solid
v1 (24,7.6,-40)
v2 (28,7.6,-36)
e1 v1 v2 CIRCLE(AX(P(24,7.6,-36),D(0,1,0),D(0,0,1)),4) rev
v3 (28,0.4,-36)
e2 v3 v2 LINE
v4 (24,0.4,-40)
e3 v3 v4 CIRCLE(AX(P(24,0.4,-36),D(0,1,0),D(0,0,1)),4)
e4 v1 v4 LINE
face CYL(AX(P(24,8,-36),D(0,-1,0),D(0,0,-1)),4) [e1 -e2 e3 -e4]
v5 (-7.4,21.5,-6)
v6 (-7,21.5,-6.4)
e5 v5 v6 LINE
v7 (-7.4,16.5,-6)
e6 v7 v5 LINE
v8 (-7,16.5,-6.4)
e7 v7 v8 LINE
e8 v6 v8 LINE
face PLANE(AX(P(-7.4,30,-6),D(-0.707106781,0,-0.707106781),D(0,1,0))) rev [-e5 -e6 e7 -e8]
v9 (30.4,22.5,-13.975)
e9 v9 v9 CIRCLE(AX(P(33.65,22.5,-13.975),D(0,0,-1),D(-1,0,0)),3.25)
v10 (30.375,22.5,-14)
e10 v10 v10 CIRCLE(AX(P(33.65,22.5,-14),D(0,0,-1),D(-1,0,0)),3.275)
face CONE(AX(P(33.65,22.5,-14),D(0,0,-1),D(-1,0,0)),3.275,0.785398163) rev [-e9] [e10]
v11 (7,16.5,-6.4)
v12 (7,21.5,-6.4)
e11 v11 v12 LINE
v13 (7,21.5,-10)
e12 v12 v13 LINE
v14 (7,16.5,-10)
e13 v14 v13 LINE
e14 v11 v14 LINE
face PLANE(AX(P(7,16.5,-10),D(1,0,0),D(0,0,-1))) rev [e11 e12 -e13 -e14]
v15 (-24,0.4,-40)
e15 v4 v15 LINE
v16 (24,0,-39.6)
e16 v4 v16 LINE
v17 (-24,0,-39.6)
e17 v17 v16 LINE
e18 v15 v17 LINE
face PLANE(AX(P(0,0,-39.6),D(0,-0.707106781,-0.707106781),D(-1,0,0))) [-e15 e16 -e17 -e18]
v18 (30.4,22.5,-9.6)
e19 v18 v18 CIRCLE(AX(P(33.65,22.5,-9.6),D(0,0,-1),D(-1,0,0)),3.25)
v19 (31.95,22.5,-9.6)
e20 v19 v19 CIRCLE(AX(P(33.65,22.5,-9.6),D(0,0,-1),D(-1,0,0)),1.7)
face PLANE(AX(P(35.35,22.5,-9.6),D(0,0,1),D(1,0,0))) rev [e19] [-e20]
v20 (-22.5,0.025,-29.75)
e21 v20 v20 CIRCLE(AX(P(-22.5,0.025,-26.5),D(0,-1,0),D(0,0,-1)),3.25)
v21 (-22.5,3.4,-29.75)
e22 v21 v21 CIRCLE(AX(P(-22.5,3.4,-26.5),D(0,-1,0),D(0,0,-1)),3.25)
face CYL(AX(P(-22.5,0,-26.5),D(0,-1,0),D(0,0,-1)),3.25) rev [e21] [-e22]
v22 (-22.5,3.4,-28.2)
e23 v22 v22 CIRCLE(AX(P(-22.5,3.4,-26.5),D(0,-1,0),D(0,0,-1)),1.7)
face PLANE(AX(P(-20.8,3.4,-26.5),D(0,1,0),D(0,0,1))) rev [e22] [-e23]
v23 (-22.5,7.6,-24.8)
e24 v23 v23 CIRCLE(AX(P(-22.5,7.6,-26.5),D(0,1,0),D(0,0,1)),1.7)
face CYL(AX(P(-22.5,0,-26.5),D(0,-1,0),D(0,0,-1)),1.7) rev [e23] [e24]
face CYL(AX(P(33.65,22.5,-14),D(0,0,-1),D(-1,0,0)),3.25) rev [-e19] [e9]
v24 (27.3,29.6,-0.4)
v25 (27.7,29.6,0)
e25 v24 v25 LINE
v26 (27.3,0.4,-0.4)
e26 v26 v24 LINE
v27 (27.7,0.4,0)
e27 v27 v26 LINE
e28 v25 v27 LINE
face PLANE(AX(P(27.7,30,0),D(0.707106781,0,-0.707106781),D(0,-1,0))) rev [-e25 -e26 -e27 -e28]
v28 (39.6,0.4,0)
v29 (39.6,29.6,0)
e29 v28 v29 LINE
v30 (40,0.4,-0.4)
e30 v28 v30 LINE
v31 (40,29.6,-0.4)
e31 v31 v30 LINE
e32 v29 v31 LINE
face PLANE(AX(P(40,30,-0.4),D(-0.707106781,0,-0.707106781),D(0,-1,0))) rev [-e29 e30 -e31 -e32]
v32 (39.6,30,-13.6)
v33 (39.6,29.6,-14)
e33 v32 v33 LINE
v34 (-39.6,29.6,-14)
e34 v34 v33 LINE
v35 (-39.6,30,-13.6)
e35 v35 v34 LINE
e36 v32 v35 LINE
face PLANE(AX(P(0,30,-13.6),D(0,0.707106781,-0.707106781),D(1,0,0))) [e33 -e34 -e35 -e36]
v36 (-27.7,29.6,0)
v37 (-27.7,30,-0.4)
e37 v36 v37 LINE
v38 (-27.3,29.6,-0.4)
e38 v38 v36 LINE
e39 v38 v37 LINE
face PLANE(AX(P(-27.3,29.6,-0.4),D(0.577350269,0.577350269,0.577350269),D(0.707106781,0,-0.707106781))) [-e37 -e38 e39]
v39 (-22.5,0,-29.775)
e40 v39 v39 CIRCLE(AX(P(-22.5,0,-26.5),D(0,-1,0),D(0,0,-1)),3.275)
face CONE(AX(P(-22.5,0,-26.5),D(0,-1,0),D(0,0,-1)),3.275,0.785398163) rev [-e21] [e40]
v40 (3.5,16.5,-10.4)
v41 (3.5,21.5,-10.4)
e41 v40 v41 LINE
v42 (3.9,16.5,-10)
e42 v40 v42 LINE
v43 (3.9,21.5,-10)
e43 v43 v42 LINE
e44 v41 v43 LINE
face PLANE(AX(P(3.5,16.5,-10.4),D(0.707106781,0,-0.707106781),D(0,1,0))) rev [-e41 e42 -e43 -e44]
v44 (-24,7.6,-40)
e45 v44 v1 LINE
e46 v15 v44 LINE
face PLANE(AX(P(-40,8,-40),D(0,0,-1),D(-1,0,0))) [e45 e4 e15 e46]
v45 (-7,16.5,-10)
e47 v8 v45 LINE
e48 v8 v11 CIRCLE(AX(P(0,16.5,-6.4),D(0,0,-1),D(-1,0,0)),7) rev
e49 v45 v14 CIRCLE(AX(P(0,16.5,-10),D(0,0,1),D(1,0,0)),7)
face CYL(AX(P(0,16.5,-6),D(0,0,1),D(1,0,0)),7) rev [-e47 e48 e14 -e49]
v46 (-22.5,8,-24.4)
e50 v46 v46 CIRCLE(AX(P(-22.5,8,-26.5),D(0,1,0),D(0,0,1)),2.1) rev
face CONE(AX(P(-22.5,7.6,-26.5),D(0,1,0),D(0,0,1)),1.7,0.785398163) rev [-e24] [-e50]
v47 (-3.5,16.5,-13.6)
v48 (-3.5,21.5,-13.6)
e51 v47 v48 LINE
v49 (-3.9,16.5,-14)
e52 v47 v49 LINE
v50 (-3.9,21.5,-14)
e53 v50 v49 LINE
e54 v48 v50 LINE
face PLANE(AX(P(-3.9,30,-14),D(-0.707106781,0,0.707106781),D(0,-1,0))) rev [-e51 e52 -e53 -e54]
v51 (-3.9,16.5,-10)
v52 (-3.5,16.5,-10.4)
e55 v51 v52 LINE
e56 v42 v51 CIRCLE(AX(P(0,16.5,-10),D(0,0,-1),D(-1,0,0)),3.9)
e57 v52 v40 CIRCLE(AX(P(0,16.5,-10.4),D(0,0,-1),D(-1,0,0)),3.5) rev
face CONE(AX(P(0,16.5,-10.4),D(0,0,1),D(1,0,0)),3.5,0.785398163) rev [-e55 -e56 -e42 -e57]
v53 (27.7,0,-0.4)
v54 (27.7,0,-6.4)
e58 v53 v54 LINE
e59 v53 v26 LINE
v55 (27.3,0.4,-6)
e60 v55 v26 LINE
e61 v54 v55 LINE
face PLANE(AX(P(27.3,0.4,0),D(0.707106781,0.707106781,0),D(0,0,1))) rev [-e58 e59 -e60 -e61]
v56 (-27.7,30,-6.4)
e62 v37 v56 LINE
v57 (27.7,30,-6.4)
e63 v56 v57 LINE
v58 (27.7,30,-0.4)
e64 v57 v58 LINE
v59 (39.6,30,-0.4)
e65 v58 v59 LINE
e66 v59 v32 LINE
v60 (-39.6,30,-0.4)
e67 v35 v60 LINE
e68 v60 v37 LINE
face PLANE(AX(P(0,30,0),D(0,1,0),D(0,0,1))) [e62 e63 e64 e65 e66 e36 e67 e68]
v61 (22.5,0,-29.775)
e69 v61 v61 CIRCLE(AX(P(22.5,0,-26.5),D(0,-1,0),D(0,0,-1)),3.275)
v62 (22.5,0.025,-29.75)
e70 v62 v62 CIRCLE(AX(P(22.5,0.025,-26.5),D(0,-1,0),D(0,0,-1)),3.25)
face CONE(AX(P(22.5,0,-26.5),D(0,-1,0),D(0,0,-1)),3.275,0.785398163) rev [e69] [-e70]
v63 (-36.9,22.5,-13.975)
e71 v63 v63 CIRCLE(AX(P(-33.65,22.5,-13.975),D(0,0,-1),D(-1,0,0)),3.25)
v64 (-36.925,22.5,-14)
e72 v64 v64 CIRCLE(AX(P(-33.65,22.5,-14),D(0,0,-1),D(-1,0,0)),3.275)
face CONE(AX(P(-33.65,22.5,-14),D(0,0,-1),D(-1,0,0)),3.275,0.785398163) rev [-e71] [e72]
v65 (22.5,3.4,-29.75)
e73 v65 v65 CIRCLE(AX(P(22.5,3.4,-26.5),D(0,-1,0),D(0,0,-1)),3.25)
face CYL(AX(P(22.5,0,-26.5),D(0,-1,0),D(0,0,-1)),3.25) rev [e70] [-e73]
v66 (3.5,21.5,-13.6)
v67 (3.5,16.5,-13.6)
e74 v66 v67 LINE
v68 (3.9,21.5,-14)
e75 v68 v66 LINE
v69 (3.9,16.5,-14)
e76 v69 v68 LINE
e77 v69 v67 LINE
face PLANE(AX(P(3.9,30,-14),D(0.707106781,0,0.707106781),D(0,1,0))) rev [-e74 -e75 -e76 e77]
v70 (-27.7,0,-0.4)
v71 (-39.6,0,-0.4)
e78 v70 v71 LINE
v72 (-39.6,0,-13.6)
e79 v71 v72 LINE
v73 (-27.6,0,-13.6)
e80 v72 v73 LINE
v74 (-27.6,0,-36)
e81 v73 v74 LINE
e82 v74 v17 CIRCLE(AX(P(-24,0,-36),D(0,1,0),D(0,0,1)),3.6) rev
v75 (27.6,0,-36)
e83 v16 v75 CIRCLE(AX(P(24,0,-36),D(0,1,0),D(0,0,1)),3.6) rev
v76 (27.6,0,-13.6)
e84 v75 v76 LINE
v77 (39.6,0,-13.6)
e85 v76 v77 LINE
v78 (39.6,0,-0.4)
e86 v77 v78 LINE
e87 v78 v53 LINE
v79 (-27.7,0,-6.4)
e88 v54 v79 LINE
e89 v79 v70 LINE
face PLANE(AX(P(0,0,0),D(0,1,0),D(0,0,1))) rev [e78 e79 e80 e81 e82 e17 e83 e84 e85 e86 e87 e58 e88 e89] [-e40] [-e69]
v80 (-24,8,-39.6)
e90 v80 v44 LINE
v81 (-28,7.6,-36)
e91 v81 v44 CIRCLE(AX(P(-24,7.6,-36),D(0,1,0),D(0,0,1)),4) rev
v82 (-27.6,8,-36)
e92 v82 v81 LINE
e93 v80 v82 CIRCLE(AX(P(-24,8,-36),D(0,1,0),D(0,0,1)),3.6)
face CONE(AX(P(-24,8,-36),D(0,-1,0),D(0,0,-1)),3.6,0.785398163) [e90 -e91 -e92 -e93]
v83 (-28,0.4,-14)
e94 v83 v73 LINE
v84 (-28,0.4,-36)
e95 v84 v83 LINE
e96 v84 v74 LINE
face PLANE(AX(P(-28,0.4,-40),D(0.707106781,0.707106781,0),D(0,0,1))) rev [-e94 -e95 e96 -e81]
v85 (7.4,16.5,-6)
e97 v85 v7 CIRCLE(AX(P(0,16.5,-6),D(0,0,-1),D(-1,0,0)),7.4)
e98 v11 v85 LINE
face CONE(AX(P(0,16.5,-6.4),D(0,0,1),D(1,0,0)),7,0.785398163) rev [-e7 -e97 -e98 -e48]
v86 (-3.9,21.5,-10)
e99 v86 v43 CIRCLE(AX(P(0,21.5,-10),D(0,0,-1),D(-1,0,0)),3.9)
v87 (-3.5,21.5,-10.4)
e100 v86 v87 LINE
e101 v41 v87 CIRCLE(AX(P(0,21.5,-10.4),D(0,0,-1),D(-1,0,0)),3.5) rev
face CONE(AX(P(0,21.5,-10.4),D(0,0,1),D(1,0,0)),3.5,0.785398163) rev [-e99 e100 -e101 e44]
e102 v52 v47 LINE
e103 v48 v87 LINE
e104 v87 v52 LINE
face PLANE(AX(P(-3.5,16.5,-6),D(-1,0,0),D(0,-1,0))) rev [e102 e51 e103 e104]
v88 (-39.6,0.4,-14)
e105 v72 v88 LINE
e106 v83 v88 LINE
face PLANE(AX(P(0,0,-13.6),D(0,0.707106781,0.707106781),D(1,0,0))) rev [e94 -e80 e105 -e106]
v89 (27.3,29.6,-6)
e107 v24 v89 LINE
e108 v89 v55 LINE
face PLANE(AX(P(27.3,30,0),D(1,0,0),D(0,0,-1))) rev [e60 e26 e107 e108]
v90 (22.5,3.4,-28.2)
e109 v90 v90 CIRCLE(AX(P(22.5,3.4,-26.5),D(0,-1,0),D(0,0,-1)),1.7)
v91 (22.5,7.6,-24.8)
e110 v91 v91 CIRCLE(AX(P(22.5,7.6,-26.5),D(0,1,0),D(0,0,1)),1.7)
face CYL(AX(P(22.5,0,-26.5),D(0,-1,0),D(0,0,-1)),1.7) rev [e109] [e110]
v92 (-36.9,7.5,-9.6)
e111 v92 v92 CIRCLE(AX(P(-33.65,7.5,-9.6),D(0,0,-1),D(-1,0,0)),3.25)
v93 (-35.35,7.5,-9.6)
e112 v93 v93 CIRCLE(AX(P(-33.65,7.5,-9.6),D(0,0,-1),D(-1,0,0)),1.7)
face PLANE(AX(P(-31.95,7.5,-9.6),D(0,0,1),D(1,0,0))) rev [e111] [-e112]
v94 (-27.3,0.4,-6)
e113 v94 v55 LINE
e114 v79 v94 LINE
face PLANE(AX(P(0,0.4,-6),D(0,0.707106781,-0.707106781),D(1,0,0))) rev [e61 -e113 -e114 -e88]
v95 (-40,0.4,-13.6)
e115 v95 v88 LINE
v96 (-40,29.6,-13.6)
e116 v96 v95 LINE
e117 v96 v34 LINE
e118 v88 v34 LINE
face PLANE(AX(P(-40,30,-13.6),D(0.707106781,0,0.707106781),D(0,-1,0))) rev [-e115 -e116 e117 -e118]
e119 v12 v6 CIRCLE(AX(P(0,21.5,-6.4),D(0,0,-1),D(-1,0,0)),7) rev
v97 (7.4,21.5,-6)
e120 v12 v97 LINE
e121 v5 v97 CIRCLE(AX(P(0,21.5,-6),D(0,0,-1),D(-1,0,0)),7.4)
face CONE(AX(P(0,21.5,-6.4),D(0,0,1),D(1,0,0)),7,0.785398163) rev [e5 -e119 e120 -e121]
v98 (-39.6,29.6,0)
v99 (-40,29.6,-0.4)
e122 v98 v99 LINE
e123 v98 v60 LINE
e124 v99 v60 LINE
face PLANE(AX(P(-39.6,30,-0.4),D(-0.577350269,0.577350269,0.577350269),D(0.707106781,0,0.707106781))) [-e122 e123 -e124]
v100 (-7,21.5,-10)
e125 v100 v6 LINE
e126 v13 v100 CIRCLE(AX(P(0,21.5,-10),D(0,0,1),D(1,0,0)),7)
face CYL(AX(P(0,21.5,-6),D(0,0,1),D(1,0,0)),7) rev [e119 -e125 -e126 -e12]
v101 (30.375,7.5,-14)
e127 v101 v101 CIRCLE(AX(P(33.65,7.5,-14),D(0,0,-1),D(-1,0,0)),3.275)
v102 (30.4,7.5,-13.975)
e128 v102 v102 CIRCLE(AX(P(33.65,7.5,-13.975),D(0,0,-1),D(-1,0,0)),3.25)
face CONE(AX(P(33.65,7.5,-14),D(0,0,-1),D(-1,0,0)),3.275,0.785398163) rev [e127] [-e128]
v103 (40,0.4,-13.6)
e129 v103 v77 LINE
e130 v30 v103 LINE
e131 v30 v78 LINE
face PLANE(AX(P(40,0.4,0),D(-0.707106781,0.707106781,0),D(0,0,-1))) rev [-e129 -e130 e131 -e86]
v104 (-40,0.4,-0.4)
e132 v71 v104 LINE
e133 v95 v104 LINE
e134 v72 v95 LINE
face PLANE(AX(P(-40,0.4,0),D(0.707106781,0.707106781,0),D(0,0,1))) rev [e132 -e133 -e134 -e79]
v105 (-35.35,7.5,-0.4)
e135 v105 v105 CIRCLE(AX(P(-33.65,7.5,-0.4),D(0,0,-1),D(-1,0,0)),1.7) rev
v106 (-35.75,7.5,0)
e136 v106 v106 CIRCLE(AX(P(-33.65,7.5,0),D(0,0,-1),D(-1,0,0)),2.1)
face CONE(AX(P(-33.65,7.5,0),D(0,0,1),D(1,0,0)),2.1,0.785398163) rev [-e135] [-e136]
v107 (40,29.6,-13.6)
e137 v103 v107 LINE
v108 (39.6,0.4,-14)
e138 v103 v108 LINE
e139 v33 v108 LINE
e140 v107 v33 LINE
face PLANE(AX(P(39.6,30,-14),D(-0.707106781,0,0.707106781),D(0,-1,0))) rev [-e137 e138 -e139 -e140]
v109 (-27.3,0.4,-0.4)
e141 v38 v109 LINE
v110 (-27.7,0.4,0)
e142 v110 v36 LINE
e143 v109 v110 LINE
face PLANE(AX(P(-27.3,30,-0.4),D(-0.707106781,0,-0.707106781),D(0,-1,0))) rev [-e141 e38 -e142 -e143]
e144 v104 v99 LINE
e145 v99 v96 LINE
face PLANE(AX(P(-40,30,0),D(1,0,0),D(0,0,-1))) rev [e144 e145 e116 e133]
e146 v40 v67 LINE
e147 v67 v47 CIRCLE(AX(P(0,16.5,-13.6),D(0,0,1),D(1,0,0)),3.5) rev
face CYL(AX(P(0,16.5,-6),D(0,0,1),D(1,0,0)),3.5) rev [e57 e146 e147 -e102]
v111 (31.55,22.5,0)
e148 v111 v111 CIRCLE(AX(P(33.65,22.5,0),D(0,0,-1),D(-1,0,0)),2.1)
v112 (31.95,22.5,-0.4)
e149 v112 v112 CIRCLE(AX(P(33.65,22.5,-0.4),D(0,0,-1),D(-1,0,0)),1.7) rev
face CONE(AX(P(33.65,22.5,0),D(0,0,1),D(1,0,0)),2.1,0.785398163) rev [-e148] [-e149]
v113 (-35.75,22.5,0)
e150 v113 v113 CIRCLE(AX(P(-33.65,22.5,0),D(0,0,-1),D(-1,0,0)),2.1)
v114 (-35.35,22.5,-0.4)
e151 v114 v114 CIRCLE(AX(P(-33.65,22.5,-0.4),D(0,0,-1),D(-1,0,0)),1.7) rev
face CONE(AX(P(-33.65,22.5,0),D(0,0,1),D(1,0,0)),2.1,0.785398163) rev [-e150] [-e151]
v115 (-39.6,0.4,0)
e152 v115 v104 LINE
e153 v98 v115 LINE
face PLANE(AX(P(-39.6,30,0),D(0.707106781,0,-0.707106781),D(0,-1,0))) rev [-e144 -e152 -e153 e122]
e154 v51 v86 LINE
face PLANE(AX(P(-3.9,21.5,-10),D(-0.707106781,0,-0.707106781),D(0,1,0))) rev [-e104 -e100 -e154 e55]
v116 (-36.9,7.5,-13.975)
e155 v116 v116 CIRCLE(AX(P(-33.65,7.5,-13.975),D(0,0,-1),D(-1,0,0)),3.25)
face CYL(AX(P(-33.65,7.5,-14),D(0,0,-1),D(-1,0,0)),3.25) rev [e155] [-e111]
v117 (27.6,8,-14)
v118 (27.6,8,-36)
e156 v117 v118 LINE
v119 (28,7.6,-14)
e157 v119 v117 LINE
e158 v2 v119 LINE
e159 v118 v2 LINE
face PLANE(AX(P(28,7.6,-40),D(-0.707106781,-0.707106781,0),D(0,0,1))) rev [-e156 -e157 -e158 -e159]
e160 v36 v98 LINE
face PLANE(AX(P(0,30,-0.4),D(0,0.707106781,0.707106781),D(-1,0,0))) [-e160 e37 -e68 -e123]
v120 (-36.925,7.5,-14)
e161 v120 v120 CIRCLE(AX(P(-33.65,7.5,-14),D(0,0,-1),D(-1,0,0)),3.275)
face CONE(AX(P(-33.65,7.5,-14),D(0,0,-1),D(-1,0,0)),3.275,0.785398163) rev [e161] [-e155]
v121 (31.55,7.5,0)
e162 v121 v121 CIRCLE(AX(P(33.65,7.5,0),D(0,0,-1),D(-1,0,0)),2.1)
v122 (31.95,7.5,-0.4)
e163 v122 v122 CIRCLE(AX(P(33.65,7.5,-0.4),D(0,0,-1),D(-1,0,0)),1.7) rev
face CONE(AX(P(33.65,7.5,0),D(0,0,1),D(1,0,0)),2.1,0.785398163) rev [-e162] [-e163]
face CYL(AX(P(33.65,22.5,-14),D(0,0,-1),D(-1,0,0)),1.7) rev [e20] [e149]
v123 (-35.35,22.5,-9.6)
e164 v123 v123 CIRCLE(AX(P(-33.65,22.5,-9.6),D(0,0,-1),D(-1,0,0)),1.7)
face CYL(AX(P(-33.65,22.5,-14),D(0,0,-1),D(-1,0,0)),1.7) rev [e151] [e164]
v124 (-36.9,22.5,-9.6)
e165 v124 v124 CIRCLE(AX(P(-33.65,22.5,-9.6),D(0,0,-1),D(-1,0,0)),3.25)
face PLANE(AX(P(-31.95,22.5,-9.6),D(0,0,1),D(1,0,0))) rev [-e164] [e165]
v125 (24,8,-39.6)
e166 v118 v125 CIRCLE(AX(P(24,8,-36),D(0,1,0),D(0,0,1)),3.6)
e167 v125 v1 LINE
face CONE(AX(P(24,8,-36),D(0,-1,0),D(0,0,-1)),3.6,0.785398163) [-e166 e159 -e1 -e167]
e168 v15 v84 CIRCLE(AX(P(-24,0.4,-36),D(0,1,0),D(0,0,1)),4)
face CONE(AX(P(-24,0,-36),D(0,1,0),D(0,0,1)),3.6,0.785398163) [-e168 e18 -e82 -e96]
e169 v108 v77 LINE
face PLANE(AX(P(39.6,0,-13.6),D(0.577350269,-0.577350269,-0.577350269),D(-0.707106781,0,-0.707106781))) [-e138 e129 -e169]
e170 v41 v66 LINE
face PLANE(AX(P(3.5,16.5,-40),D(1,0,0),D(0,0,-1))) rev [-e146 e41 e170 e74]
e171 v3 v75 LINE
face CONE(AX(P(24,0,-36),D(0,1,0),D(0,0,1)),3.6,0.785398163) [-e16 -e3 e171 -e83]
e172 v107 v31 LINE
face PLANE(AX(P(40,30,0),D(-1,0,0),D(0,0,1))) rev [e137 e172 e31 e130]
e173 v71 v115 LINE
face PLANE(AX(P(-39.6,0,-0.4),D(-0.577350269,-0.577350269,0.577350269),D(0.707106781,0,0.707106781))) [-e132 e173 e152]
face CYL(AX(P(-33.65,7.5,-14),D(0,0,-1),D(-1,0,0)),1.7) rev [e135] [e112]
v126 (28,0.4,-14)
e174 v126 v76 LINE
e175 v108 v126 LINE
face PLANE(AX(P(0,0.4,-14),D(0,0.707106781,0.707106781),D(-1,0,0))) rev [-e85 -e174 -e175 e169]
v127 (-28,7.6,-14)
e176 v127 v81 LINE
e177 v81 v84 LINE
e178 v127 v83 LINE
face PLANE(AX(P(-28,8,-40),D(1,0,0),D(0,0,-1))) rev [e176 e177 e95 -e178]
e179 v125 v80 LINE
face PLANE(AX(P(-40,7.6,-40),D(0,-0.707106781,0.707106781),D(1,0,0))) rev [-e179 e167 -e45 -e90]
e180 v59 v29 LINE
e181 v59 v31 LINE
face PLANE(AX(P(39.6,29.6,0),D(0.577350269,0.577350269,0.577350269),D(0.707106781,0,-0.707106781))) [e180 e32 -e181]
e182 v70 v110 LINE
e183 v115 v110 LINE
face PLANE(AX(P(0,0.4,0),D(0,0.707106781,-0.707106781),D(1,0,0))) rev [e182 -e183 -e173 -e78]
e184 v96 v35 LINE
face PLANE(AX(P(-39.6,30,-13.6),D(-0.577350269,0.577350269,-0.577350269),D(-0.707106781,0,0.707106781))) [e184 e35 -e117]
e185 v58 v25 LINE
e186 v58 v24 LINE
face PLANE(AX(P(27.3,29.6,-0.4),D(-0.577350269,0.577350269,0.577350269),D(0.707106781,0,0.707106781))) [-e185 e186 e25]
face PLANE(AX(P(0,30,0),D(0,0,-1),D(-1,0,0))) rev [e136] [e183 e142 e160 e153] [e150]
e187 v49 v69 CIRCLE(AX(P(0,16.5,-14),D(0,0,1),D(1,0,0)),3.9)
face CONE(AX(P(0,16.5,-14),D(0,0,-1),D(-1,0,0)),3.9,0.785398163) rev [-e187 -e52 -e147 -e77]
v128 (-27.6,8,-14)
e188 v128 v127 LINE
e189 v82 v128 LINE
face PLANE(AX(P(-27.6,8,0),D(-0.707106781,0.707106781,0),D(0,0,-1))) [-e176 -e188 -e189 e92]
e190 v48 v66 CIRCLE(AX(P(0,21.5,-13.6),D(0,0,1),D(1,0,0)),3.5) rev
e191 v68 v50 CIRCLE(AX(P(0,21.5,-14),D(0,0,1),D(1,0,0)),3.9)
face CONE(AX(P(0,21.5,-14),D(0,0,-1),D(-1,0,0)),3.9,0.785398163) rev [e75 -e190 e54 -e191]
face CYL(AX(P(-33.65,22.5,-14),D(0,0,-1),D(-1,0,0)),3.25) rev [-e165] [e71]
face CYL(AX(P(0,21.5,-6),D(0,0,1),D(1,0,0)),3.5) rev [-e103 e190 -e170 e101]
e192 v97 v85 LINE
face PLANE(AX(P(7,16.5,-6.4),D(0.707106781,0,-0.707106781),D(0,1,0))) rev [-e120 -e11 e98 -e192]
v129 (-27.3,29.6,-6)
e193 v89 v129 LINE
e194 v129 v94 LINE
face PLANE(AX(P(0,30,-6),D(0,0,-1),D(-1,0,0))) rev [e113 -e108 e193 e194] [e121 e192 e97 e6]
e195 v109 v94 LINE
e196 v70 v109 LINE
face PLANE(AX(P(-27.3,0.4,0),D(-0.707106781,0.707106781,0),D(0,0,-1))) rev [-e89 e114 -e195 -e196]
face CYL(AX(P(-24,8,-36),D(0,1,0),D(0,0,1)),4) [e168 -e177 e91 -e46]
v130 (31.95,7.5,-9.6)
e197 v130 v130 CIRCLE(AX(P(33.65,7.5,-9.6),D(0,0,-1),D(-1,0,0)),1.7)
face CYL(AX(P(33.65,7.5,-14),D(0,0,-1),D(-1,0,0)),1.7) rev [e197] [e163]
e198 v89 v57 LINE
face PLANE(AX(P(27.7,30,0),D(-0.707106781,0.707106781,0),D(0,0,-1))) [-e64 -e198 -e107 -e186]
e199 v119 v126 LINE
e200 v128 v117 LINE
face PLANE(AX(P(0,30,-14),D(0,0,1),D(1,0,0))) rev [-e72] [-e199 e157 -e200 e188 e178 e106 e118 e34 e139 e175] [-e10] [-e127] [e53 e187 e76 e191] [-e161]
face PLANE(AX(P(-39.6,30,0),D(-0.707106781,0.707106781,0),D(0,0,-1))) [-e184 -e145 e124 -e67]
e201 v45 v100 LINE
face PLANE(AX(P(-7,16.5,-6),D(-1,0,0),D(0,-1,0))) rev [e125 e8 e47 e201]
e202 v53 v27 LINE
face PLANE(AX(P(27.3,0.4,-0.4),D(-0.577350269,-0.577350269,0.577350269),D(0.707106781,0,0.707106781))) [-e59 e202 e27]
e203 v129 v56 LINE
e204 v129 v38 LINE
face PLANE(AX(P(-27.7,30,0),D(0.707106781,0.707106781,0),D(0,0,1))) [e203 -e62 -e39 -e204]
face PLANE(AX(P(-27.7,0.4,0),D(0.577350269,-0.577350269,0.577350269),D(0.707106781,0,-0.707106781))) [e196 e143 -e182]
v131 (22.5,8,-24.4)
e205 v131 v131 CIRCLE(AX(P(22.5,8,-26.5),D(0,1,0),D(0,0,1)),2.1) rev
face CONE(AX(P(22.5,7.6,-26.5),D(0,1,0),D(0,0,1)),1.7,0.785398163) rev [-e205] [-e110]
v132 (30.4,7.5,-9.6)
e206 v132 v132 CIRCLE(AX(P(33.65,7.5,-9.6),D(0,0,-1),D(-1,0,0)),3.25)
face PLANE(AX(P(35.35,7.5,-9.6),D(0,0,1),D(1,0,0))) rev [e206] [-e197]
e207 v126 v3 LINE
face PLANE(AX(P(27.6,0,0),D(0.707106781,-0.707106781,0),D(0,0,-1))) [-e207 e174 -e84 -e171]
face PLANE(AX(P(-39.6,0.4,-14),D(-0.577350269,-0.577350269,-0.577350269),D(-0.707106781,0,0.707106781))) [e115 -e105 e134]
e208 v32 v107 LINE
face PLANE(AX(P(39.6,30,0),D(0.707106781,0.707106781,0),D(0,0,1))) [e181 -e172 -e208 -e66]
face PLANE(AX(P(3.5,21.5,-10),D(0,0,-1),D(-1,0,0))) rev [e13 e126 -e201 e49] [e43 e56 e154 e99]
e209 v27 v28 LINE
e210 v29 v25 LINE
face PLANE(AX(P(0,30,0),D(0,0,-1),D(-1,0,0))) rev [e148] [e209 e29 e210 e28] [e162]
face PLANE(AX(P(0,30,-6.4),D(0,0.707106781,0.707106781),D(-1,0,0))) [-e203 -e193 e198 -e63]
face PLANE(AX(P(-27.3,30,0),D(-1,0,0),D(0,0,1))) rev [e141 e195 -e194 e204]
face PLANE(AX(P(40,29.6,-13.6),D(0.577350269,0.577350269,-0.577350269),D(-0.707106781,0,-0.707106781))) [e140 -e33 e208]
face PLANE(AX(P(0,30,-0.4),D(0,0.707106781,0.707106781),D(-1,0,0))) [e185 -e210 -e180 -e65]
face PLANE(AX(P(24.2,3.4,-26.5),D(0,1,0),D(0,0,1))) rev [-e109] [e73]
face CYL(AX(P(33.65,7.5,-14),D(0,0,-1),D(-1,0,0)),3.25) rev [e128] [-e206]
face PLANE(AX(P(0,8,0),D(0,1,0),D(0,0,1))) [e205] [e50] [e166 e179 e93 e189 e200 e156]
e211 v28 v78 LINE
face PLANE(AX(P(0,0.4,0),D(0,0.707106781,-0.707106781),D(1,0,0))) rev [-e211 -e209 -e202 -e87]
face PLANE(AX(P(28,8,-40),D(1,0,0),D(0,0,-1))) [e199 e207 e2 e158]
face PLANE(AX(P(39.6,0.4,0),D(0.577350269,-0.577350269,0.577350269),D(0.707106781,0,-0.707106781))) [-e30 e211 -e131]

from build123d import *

# Parameters (mm, degrees)
BOSS_EXTRUDE1_DEPTH                            = 30
SKETCH2_W                                      = 80
SKETCH2_H                                      = 26
BOSS_EXTRUDE2_DEPTH                            = 8
CBORE_FOR_M3_HEX_SOCKET_HEAD_CAP_SCR_2_COUNT   = 2
CBORE_FOR_M3_HEX_SOCKET_HEAD_CAP_SCR_2_PITCH   = 45
SKETCH5_W                                      = 12
SKETCH5_H                                      = 26
CUT_EXTRUDE1_DEPTH                             = 8
FILLET1_R                                      = 4
CBORE_FOR_M3_HEX_SOCKET_HEAD_CAP_SCR_3_COUNT   = 2
CBORE_FOR_M3_HEX_SOCKET_HEAD_CAP_SCR_3_PITCH   = 68.951359668
CBORE_FOR_M3_HEX_SOCKET_HEAD_CAP_SCR_4_COUNT   = 2
CBORE_FOR_M3_HEX_SOCKET_HEAD_CAP_SCR_4_PITCH   = 67.3
CBORE_FOR_M3_HEX_SOCKET_HEAD_CAP_SCR_5_COUNT   = 2
CBORE_FOR_M3_HEX_SOCKET_HEAD_CAP_SCR_5_PITCH   = 15
CBORE_START                                    = -10
CBORE_SLOT_FOR_M6_HEX_SOCKET_HEAD_CAP_SC_DEPTH = 4
CBORE_START_2                                  = -14
CBORE_SLOT_FOR_M6_HEX_SOCKET_HEAD_CA_3_DEPTH   = 4
CHAMFER1_SIZE                                  = 0.4


# Read off the part's stored shape, not the designer's step: CBORE SLOT for M6 Hex Socket Head Cap Screw2
with BuildPart() as part:
    # Sketch1 → Boss-Extrude1 (new body)
    with BuildSketch(Plane(origin=(0, 0, 0), x_dir=(1, 0, 0), z_dir=(0, 1, 0))):
        Polygon((-40, 14), (-40, 0), (-27.3, 0), (-27.3, 6), (27.3, 6), (27.3, 0), (40, 0), (40, 14), align=None)
    extrude(amount=BOSS_EXTRUDE1_DEPTH)

    # Sketch2 → Boss-Extrude2 (add)
    with BuildSketch(Plane.XZ):
        with Locations((0, -27)):
            Rectangle(SKETCH2_W, SKETCH2_H)
    extrude(amount=-BOSS_EXTRUDE2_DEPTH)

    # Sketch4 → CBORE for M3 Hex Socket Head Cap Screw1 (revolve, cut)
    with BuildSketch(Plane(origin=(-22.5, 0, -26.5), x_dir=(0, 0, -1), z_dir=(1, 0, 0))):
        Polygon((0, 0), (0, 21.021463052), (1.7, 20), (1.7, 3.4), (3.25, 3.4), (3.25, 0.025), (3.275, 0), align=None)
    cbore_for_m3_hex_socket_head_cap_screw1 = revolve(axis=Axis((-22.5, -6.35, -26.5), (0, 1, 0)), mode=Mode.SUBTRACT)

    # CBORE for M3 Hex Socket Head Cap Scr 2: CBORE for M3 Hex Socket Head Cap Screw1 ×2
    with Locations(*[(i * CBORE_FOR_M3_HEX_SOCKET_HEAD_CAP_SCR_2_PITCH, 0, 0) for i in range(1, CBORE_FOR_M3_HEX_SOCKET_HEAD_CAP_SCR_2_COUNT)]):
        add(cbore_for_m3_hex_socket_head_cap_screw1, mode=Mode.SUBTRACT)

    # Sketch5 → Cut-Extrude1 (cut)
    with BuildSketch(Plane.XZ):
        with Locations((-34, -27)):
            Rectangle(SKETCH5_W, SKETCH5_H)
        with Locations((34, -27)):
            Rectangle(SKETCH5_W, SKETCH5_H)
    extrude(amount=-CUT_EXTRUDE1_DEPTH, mode=Mode.SUBTRACT)

    # Fillet1
    fillet1_edges = [part.edges().sort_by_distance(p)[0] for p in [
        (28, 4, -40),
        (-28, 4, -40),
    ]]
    fillet(fillet1_edges, radius=FILLET1_R)

    # Sketch7 → CBORE for M3 Hex Socket Head Cap Screw2 (revolve, cut)
    with BuildSketch(Plane(origin=(33.65, 22.5, -14), x_dir=(0, 1, 0), z_dir=(1, 0, 0))):
        Polygon((0, 0), (0, 21.021463052), (1.7, 20), (1.7, 4.4), (3.25, 4.4), (3.25, 0.025), (3.275, 0), align=None)
    cbore_for_m3_hex_socket_head_cap_screw2 = revolve(axis=Axis((33.65, 22.5, -20.35), (0, 0, 1)), mode=Mode.SUBTRACT)

    # CBORE for M3 Hex Socket Head Cap Scr 3: CBORE for M3 Hex Socket Head Cap Screw2 ×2
    with Locations(*[Vector(-0.9760503683250792, -0.2175446586162881, 0) * (i * CBORE_FOR_M3_HEX_SOCKET_HEAD_CAP_SCR_3_PITCH) for i in range(1, CBORE_FOR_M3_HEX_SOCKET_HEAD_CAP_SCR_3_COUNT)]):
        add(cbore_for_m3_hex_socket_head_cap_screw2, mode=Mode.SUBTRACT)

    # CBORE for M3 Hex Socket Head Cap Scr 4: CBORE for M3 Hex Socket Head Cap Screw2 ×2
    with Locations(*[(-i * CBORE_FOR_M3_HEX_SOCKET_HEAD_CAP_SCR_4_PITCH, 0, 0) for i in range(1, CBORE_FOR_M3_HEX_SOCKET_HEAD_CAP_SCR_4_COUNT)]):
        add(cbore_for_m3_hex_socket_head_cap_screw2, mode=Mode.SUBTRACT)

    # CBORE for M3 Hex Socket Head Cap Scr 5: CBORE for M3 Hex Socket Head Cap Screw2 ×2
    with Locations(*[(0, -i * CBORE_FOR_M3_HEX_SOCKET_HEAD_CAP_SCR_5_PITCH, 0) for i in range(1, CBORE_FOR_M3_HEX_SOCKET_HEAD_CAP_SCR_5_COUNT)]):
        add(cbore_for_m3_hex_socket_head_cap_screw2, mode=Mode.SUBTRACT)

    # CBORE SLOT for M6 Hex Socket Head Ca 2 → CBORE SLOT for M6 Hex Socket Head Cap Screw2 (cut)
    with BuildSketch(Plane.XY.offset(CBORE_START)):
        with BuildLine():
            Line((7, 16.5), (7, 21.5))
            ThreePointArc((7, 21.5), (0, 28.5), (-7, 21.5))
            Line((-7, 21.5), (-7, 16.5))
            ThreePointArc((-7, 16.5), (0, 9.5), (7, 16.5))
        make_face()
    extrude(amount=CBORE_SLOT_FOR_M6_HEX_SOCKET_HEAD_CAP_SC_DEPTH, mode=Mode.SUBTRACT)

    # CBORE SLOT for M6 Hex Socket Head Ca 3 o → CBORE SLOT for M6 Hex Socket Head Ca 3 (cut)
    with BuildSketch(Plane.XY.offset(CBORE_START_2)):
        with BuildLine():
            Line((3.5, 16.5), (3.5, 21.5))
            ThreePointArc((3.5, 21.5), (0, 25), (-3.5, 21.5))
            Line((-3.5, 21.5), (-3.5, 16.5))
            ThreePointArc((-3.5, 16.5), (0, 13), (3.5, 16.5))
        make_face()
    extrude(amount=CBORE_SLOT_FOR_M6_HEX_SOCKET_HEAD_CA_3_DEPTH, mode=Mode.SUBTRACT)

    # Chamfer1
    chamfer1_edges = [part.edges().sort_by_distance(p)[0] for p in [
        (33.65, 20.8, 0),
        (40, 0, -7),
        (33.65, 5.8, 0),
        (33.65, 0, 0),
        (-33.65, 30, 0),
        (27.3, 0, -3),
        (-33.65, 20.8, 0),
        (0, 0, -6),
        (-27.3, 0, -3),
        (-33.65, 5.8, 0),
        (-33.65, 0, 0),
        (3.5, 19, -14),
        (0, 13, -14),
        (0, 25, -14),
        (-3.5, 19, -14),
        (-3.5, 19, -10),
        (7, 19, -6),
        (0, 28.5, -6),
        (0, 9.5, -6),
        (0, 25, -10),
        (0, 13, -10),
        (3.5, 19, -10),
        (-7, 19, -6),
        (-27.3, 30, -3),
        (-40, 15, -14),
        (40, 15, -14),
        (40, 15, 0),
        (27.3, 15, 0),
        (-27.3, 15, 0),
        (-40, 15, 0),
        (0, 30, -6),
        (27.3, 30, -3),
        (33.65, 30, 0),
        (40, 30, -7),
        (0, 30, -14),
        (-22.5, 8, -24.8),
        (22.5, 8, -24.8),
        (-40, 30, -7),
        (-40, 0, -7),
        (34, 0, -14),
        (-34, 0, -14),
        (-28, 0, -25),
        (-28, 8, -25),
        (28, 0, -25),
        (0, 0, -40),
        (26.828427125, 0, -38.828427125),
        (-26.828427125, 0, -38.828427125),
        (0, 8, -40),
        (28, 8, -25),
        (26.828427125, 8, -38.828427125),
        (-26.828427125, 8, -38.828427125),
    ]]
    chamfer(chamfer1_edges, length=CHAMFER1_SIZE)


solid = part.part
